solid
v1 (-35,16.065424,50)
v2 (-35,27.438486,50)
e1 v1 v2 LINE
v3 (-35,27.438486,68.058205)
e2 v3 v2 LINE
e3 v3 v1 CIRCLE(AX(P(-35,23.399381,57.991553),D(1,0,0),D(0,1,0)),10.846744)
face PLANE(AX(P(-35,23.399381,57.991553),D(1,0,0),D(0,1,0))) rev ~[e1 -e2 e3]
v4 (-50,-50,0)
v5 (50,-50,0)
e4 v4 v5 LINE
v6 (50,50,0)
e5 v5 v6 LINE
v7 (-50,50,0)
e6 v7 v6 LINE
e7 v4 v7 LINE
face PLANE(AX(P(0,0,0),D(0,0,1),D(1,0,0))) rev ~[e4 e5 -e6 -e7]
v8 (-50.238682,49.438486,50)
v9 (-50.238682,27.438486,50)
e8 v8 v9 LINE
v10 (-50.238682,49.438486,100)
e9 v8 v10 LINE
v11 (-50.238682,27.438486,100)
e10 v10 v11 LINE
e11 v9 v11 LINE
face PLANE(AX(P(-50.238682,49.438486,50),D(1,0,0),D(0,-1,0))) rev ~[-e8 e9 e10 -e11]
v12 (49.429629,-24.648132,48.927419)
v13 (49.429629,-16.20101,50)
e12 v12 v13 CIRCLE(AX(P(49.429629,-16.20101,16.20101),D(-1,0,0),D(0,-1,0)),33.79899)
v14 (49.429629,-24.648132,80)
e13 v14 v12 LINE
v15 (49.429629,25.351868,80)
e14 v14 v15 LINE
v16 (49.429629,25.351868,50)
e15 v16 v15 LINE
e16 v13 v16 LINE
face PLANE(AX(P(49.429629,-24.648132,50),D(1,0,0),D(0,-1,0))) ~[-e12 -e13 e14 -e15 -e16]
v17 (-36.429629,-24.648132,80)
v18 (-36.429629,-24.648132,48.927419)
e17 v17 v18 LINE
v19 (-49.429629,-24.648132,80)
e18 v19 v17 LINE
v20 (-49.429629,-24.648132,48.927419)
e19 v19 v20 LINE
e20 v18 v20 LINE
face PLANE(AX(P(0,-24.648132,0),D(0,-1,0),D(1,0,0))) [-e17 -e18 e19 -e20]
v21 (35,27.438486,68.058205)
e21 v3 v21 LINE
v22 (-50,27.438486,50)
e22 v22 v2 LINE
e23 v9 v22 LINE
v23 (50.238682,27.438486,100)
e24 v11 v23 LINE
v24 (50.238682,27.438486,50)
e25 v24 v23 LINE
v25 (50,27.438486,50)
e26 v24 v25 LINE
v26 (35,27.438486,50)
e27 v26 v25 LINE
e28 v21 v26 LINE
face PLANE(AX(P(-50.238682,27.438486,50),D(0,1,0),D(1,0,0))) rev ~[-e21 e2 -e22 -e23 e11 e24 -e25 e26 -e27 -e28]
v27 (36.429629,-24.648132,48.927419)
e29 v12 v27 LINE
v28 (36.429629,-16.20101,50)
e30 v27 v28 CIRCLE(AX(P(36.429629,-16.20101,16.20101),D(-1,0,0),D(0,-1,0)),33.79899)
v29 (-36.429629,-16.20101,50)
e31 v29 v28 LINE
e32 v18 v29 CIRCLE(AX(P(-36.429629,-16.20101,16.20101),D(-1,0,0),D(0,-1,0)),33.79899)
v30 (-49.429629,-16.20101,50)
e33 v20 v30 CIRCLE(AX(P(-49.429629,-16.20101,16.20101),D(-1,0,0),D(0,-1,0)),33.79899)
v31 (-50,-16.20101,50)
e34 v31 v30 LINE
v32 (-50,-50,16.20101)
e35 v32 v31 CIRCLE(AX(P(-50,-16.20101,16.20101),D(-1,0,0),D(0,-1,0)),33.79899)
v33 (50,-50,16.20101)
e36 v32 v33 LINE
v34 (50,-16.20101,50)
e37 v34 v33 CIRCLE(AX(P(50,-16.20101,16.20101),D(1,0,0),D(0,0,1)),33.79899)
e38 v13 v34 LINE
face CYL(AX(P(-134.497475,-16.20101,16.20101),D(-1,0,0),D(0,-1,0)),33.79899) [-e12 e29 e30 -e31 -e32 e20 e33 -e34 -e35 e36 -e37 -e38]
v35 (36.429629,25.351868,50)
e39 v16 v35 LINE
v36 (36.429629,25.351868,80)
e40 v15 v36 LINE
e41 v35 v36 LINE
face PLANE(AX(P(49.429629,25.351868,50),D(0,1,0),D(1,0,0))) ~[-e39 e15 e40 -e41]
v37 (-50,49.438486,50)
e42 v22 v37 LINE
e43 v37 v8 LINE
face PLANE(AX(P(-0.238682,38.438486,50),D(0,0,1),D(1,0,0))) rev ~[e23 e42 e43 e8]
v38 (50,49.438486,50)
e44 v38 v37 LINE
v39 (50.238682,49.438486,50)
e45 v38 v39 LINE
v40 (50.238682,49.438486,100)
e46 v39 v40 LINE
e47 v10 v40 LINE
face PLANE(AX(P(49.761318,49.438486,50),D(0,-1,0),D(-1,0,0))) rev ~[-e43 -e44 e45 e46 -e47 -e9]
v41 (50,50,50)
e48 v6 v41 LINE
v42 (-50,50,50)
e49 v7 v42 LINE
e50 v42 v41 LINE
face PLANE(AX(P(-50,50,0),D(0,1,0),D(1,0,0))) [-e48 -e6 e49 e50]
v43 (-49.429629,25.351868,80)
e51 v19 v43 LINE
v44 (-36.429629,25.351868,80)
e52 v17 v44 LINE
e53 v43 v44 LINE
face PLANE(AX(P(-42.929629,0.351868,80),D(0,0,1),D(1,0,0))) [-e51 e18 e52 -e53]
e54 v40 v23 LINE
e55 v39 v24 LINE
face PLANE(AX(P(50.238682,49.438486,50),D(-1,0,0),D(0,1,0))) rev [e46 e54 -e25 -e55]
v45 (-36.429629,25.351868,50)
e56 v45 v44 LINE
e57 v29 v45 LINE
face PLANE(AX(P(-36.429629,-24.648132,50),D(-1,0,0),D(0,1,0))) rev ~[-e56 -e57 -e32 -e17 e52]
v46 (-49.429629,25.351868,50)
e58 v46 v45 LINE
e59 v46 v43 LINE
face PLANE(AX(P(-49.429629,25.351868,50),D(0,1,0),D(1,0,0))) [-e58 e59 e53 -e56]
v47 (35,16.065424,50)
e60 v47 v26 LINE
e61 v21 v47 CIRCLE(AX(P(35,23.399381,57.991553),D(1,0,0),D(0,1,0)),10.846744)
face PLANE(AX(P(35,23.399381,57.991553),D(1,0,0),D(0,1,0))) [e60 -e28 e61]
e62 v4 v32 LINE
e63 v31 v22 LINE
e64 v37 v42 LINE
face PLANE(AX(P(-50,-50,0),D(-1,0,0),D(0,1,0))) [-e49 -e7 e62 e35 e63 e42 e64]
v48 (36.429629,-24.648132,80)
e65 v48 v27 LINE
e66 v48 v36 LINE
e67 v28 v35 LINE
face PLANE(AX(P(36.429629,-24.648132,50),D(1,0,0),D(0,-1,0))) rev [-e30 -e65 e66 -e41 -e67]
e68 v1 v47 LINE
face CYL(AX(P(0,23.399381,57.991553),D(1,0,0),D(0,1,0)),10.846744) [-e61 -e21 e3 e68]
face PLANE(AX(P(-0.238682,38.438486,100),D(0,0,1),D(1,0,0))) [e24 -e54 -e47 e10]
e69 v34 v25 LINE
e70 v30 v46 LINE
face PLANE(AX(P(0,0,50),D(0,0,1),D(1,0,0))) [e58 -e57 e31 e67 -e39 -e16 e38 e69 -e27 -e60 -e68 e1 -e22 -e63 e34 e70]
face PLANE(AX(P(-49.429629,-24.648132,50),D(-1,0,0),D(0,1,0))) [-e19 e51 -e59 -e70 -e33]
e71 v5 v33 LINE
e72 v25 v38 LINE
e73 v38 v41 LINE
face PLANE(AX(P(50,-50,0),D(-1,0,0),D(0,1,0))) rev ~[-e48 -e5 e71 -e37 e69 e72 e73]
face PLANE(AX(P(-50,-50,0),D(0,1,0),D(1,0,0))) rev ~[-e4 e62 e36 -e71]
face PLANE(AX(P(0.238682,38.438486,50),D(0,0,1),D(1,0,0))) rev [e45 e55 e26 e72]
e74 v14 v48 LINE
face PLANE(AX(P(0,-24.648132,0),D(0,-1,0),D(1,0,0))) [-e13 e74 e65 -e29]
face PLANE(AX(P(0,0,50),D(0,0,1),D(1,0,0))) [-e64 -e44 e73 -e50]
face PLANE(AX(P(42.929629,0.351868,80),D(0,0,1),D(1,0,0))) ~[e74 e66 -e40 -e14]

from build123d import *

# Parameters (mm, degrees)
F0_W          = 100
F0_H          = 100
F1_DEPTH      = 50
F4_DEPTH      = 50
F5_W          = 13
F5_H          = 50
F6_DEPTH      = 30
F8_R          = 10.8467438632
F9_DEPTH      = 35
F10_T4_DEPTH  = 268.9949493661
F10_T9_DEPTH  = 268.9949493661
F10_T14_DEPTH = 268.9949493661
F10_T20_DEPTH = 268.9949493661


# Not quite as in the source:
# - a fillet or chamfer that OpenCascade refuses, or shapes differently, is made with other operations: its cross-section is extruded or revolved along the edge and cut away or added


with BuildPart() as f1:
    # F0 (on Top) → F1 (new body)
    with BuildSketch(Plane.XY):
        Rectangle(F0_W, F0_H)
    extrude(amount=F1_DEPTH)

    # F3 (on offset) → F4 (join)
    with BuildSketch(Plane.XY.offset(50)):
        Polygon((49.7613176703, 49.4384859949), (-50.2386823297, 49.4384859949), (-50.2386823297, 27.4384859949), (-42.6304154098, 27.4384859949), (49.7613176703, 27.4384859949), align=None)
    extrude(amount=F4_DEPTH)

    # F5 (on offset) → F6 (join)
    with BuildSketch(Plane.XY.offset(50)):
        with Locations((-42.9296287298, 0.3518681973)):
            Rectangle(F5_W, F5_H)
    extrude(amount=F6_DEPTH)

    # F7: F1 across plane


with BuildPart() as f1_1:
    add(f1.part)
    add(f1.part.mirror(Plane.YZ))

    # F8 (on Right) → F9 (join, symmetric)
    with BuildSketch(Plane.YZ):
        with Locations((23.399380967, 57.991553098)):
            Circle(F8_R)
    extrude(amount=F9_DEPTH, both=True)

    # F10: fillet of radius 33.7989898732 on 1 edges, made by hand


with BuildPart() as f10_tool2:
    # F10_s3 → F10_t4 (new body)
    with BuildSketch(Plane.YZ.offset(-134.4974746831)):
        with BuildLine():
            ThreePointArc((-50, 16.2010101268), (-40.1005050634, 40.1005050634), (-16.2010101268, 50))
            Line((-16.2010101268, 50), (-50, 50))
            Line((-50, 50), (-50, 16.2010101268))
        make_face()
    extrude(amount=F10_T4_DEPTH)

    split(bisect_by=Plane.XZ.offset(24.6481318027), keep=Keep.TOP)


with BuildPart() as f1_2:
    add(f1_1.part)

    # F10_t1: cut F10_tool2
    add(f10_tool2.part, mode=Mode.SUBTRACT)


with BuildPart() as f10_tool7:
    # F10_s8 → F10_t9 (new body)
    with BuildSketch(Plane.YZ.offset(-134.4974746831)):
        with BuildLine():
            ThreePointArc((-50, 16.2010101268), (-40.1005050634, 40.1005050634), (-16.2010101268, 50))
            Line((-16.2010101268, 50), (-50, 50))
            Line((-50, 50), (-50, 16.2010101268))
        make_face()
    extrude(amount=F10_T9_DEPTH)

    split(bisect_by=Plane.YZ.offset(-49.4296287298), keep=Keep.BOTTOM)


with BuildPart() as f1_3:
    add(f1_2.part)

    # F10_t6: cut F10_tool7
    add(f10_tool7.part, mode=Mode.SUBTRACT)


with BuildPart() as f10_tool12:
    # F10_s13 → F10_t14 (new body)
    with BuildSketch(Plane.YZ.offset(-134.4974746831)):
        with BuildLine():
            ThreePointArc((-50, 16.2010101268), (-40.1005050634, 40.1005050634), (-16.2010101268, 50))
            Line((-16.2010101268, 50), (-50, 50))
            Line((-50, 50), (-50, 16.2010101268))
        make_face()
    extrude(amount=F10_T14_DEPTH)

    split(bisect_by=Plane.YZ.offset(-36.4296287298), keep=Keep.TOP)

    split(bisect_by=Plane.YZ.offset(36.4296287298), keep=Keep.BOTTOM)


with BuildPart() as f1_4:
    add(f1_3.part)

    # F10_t11: cut F10_tool12
    add(f10_tool12.part, mode=Mode.SUBTRACT)


with BuildPart() as f10_tool18:
    # F10_s19 → F10_t20 (new body)
    with BuildSketch(Plane.YZ.offset(-134.4974746831)):
        with BuildLine():
            ThreePointArc((-50, 16.2010101268), (-40.1005050634, 40.1005050634), (-16.2010101268, 50))
            Line((-16.2010101268, 50), (-50, 50))
            Line((-50, 50), (-50, 16.2010101268))
        make_face()
    extrude(amount=F10_T20_DEPTH)

    split(bisect_by=Plane.YZ.offset(49.4296287298), keep=Keep.TOP)


with BuildPart() as f1_5:
    add(f1_4.part)

    # F10_t17: cut F10_tool18
    add(f10_tool18.part, mode=Mode.SUBTRACT)


solid = f1_5.part
